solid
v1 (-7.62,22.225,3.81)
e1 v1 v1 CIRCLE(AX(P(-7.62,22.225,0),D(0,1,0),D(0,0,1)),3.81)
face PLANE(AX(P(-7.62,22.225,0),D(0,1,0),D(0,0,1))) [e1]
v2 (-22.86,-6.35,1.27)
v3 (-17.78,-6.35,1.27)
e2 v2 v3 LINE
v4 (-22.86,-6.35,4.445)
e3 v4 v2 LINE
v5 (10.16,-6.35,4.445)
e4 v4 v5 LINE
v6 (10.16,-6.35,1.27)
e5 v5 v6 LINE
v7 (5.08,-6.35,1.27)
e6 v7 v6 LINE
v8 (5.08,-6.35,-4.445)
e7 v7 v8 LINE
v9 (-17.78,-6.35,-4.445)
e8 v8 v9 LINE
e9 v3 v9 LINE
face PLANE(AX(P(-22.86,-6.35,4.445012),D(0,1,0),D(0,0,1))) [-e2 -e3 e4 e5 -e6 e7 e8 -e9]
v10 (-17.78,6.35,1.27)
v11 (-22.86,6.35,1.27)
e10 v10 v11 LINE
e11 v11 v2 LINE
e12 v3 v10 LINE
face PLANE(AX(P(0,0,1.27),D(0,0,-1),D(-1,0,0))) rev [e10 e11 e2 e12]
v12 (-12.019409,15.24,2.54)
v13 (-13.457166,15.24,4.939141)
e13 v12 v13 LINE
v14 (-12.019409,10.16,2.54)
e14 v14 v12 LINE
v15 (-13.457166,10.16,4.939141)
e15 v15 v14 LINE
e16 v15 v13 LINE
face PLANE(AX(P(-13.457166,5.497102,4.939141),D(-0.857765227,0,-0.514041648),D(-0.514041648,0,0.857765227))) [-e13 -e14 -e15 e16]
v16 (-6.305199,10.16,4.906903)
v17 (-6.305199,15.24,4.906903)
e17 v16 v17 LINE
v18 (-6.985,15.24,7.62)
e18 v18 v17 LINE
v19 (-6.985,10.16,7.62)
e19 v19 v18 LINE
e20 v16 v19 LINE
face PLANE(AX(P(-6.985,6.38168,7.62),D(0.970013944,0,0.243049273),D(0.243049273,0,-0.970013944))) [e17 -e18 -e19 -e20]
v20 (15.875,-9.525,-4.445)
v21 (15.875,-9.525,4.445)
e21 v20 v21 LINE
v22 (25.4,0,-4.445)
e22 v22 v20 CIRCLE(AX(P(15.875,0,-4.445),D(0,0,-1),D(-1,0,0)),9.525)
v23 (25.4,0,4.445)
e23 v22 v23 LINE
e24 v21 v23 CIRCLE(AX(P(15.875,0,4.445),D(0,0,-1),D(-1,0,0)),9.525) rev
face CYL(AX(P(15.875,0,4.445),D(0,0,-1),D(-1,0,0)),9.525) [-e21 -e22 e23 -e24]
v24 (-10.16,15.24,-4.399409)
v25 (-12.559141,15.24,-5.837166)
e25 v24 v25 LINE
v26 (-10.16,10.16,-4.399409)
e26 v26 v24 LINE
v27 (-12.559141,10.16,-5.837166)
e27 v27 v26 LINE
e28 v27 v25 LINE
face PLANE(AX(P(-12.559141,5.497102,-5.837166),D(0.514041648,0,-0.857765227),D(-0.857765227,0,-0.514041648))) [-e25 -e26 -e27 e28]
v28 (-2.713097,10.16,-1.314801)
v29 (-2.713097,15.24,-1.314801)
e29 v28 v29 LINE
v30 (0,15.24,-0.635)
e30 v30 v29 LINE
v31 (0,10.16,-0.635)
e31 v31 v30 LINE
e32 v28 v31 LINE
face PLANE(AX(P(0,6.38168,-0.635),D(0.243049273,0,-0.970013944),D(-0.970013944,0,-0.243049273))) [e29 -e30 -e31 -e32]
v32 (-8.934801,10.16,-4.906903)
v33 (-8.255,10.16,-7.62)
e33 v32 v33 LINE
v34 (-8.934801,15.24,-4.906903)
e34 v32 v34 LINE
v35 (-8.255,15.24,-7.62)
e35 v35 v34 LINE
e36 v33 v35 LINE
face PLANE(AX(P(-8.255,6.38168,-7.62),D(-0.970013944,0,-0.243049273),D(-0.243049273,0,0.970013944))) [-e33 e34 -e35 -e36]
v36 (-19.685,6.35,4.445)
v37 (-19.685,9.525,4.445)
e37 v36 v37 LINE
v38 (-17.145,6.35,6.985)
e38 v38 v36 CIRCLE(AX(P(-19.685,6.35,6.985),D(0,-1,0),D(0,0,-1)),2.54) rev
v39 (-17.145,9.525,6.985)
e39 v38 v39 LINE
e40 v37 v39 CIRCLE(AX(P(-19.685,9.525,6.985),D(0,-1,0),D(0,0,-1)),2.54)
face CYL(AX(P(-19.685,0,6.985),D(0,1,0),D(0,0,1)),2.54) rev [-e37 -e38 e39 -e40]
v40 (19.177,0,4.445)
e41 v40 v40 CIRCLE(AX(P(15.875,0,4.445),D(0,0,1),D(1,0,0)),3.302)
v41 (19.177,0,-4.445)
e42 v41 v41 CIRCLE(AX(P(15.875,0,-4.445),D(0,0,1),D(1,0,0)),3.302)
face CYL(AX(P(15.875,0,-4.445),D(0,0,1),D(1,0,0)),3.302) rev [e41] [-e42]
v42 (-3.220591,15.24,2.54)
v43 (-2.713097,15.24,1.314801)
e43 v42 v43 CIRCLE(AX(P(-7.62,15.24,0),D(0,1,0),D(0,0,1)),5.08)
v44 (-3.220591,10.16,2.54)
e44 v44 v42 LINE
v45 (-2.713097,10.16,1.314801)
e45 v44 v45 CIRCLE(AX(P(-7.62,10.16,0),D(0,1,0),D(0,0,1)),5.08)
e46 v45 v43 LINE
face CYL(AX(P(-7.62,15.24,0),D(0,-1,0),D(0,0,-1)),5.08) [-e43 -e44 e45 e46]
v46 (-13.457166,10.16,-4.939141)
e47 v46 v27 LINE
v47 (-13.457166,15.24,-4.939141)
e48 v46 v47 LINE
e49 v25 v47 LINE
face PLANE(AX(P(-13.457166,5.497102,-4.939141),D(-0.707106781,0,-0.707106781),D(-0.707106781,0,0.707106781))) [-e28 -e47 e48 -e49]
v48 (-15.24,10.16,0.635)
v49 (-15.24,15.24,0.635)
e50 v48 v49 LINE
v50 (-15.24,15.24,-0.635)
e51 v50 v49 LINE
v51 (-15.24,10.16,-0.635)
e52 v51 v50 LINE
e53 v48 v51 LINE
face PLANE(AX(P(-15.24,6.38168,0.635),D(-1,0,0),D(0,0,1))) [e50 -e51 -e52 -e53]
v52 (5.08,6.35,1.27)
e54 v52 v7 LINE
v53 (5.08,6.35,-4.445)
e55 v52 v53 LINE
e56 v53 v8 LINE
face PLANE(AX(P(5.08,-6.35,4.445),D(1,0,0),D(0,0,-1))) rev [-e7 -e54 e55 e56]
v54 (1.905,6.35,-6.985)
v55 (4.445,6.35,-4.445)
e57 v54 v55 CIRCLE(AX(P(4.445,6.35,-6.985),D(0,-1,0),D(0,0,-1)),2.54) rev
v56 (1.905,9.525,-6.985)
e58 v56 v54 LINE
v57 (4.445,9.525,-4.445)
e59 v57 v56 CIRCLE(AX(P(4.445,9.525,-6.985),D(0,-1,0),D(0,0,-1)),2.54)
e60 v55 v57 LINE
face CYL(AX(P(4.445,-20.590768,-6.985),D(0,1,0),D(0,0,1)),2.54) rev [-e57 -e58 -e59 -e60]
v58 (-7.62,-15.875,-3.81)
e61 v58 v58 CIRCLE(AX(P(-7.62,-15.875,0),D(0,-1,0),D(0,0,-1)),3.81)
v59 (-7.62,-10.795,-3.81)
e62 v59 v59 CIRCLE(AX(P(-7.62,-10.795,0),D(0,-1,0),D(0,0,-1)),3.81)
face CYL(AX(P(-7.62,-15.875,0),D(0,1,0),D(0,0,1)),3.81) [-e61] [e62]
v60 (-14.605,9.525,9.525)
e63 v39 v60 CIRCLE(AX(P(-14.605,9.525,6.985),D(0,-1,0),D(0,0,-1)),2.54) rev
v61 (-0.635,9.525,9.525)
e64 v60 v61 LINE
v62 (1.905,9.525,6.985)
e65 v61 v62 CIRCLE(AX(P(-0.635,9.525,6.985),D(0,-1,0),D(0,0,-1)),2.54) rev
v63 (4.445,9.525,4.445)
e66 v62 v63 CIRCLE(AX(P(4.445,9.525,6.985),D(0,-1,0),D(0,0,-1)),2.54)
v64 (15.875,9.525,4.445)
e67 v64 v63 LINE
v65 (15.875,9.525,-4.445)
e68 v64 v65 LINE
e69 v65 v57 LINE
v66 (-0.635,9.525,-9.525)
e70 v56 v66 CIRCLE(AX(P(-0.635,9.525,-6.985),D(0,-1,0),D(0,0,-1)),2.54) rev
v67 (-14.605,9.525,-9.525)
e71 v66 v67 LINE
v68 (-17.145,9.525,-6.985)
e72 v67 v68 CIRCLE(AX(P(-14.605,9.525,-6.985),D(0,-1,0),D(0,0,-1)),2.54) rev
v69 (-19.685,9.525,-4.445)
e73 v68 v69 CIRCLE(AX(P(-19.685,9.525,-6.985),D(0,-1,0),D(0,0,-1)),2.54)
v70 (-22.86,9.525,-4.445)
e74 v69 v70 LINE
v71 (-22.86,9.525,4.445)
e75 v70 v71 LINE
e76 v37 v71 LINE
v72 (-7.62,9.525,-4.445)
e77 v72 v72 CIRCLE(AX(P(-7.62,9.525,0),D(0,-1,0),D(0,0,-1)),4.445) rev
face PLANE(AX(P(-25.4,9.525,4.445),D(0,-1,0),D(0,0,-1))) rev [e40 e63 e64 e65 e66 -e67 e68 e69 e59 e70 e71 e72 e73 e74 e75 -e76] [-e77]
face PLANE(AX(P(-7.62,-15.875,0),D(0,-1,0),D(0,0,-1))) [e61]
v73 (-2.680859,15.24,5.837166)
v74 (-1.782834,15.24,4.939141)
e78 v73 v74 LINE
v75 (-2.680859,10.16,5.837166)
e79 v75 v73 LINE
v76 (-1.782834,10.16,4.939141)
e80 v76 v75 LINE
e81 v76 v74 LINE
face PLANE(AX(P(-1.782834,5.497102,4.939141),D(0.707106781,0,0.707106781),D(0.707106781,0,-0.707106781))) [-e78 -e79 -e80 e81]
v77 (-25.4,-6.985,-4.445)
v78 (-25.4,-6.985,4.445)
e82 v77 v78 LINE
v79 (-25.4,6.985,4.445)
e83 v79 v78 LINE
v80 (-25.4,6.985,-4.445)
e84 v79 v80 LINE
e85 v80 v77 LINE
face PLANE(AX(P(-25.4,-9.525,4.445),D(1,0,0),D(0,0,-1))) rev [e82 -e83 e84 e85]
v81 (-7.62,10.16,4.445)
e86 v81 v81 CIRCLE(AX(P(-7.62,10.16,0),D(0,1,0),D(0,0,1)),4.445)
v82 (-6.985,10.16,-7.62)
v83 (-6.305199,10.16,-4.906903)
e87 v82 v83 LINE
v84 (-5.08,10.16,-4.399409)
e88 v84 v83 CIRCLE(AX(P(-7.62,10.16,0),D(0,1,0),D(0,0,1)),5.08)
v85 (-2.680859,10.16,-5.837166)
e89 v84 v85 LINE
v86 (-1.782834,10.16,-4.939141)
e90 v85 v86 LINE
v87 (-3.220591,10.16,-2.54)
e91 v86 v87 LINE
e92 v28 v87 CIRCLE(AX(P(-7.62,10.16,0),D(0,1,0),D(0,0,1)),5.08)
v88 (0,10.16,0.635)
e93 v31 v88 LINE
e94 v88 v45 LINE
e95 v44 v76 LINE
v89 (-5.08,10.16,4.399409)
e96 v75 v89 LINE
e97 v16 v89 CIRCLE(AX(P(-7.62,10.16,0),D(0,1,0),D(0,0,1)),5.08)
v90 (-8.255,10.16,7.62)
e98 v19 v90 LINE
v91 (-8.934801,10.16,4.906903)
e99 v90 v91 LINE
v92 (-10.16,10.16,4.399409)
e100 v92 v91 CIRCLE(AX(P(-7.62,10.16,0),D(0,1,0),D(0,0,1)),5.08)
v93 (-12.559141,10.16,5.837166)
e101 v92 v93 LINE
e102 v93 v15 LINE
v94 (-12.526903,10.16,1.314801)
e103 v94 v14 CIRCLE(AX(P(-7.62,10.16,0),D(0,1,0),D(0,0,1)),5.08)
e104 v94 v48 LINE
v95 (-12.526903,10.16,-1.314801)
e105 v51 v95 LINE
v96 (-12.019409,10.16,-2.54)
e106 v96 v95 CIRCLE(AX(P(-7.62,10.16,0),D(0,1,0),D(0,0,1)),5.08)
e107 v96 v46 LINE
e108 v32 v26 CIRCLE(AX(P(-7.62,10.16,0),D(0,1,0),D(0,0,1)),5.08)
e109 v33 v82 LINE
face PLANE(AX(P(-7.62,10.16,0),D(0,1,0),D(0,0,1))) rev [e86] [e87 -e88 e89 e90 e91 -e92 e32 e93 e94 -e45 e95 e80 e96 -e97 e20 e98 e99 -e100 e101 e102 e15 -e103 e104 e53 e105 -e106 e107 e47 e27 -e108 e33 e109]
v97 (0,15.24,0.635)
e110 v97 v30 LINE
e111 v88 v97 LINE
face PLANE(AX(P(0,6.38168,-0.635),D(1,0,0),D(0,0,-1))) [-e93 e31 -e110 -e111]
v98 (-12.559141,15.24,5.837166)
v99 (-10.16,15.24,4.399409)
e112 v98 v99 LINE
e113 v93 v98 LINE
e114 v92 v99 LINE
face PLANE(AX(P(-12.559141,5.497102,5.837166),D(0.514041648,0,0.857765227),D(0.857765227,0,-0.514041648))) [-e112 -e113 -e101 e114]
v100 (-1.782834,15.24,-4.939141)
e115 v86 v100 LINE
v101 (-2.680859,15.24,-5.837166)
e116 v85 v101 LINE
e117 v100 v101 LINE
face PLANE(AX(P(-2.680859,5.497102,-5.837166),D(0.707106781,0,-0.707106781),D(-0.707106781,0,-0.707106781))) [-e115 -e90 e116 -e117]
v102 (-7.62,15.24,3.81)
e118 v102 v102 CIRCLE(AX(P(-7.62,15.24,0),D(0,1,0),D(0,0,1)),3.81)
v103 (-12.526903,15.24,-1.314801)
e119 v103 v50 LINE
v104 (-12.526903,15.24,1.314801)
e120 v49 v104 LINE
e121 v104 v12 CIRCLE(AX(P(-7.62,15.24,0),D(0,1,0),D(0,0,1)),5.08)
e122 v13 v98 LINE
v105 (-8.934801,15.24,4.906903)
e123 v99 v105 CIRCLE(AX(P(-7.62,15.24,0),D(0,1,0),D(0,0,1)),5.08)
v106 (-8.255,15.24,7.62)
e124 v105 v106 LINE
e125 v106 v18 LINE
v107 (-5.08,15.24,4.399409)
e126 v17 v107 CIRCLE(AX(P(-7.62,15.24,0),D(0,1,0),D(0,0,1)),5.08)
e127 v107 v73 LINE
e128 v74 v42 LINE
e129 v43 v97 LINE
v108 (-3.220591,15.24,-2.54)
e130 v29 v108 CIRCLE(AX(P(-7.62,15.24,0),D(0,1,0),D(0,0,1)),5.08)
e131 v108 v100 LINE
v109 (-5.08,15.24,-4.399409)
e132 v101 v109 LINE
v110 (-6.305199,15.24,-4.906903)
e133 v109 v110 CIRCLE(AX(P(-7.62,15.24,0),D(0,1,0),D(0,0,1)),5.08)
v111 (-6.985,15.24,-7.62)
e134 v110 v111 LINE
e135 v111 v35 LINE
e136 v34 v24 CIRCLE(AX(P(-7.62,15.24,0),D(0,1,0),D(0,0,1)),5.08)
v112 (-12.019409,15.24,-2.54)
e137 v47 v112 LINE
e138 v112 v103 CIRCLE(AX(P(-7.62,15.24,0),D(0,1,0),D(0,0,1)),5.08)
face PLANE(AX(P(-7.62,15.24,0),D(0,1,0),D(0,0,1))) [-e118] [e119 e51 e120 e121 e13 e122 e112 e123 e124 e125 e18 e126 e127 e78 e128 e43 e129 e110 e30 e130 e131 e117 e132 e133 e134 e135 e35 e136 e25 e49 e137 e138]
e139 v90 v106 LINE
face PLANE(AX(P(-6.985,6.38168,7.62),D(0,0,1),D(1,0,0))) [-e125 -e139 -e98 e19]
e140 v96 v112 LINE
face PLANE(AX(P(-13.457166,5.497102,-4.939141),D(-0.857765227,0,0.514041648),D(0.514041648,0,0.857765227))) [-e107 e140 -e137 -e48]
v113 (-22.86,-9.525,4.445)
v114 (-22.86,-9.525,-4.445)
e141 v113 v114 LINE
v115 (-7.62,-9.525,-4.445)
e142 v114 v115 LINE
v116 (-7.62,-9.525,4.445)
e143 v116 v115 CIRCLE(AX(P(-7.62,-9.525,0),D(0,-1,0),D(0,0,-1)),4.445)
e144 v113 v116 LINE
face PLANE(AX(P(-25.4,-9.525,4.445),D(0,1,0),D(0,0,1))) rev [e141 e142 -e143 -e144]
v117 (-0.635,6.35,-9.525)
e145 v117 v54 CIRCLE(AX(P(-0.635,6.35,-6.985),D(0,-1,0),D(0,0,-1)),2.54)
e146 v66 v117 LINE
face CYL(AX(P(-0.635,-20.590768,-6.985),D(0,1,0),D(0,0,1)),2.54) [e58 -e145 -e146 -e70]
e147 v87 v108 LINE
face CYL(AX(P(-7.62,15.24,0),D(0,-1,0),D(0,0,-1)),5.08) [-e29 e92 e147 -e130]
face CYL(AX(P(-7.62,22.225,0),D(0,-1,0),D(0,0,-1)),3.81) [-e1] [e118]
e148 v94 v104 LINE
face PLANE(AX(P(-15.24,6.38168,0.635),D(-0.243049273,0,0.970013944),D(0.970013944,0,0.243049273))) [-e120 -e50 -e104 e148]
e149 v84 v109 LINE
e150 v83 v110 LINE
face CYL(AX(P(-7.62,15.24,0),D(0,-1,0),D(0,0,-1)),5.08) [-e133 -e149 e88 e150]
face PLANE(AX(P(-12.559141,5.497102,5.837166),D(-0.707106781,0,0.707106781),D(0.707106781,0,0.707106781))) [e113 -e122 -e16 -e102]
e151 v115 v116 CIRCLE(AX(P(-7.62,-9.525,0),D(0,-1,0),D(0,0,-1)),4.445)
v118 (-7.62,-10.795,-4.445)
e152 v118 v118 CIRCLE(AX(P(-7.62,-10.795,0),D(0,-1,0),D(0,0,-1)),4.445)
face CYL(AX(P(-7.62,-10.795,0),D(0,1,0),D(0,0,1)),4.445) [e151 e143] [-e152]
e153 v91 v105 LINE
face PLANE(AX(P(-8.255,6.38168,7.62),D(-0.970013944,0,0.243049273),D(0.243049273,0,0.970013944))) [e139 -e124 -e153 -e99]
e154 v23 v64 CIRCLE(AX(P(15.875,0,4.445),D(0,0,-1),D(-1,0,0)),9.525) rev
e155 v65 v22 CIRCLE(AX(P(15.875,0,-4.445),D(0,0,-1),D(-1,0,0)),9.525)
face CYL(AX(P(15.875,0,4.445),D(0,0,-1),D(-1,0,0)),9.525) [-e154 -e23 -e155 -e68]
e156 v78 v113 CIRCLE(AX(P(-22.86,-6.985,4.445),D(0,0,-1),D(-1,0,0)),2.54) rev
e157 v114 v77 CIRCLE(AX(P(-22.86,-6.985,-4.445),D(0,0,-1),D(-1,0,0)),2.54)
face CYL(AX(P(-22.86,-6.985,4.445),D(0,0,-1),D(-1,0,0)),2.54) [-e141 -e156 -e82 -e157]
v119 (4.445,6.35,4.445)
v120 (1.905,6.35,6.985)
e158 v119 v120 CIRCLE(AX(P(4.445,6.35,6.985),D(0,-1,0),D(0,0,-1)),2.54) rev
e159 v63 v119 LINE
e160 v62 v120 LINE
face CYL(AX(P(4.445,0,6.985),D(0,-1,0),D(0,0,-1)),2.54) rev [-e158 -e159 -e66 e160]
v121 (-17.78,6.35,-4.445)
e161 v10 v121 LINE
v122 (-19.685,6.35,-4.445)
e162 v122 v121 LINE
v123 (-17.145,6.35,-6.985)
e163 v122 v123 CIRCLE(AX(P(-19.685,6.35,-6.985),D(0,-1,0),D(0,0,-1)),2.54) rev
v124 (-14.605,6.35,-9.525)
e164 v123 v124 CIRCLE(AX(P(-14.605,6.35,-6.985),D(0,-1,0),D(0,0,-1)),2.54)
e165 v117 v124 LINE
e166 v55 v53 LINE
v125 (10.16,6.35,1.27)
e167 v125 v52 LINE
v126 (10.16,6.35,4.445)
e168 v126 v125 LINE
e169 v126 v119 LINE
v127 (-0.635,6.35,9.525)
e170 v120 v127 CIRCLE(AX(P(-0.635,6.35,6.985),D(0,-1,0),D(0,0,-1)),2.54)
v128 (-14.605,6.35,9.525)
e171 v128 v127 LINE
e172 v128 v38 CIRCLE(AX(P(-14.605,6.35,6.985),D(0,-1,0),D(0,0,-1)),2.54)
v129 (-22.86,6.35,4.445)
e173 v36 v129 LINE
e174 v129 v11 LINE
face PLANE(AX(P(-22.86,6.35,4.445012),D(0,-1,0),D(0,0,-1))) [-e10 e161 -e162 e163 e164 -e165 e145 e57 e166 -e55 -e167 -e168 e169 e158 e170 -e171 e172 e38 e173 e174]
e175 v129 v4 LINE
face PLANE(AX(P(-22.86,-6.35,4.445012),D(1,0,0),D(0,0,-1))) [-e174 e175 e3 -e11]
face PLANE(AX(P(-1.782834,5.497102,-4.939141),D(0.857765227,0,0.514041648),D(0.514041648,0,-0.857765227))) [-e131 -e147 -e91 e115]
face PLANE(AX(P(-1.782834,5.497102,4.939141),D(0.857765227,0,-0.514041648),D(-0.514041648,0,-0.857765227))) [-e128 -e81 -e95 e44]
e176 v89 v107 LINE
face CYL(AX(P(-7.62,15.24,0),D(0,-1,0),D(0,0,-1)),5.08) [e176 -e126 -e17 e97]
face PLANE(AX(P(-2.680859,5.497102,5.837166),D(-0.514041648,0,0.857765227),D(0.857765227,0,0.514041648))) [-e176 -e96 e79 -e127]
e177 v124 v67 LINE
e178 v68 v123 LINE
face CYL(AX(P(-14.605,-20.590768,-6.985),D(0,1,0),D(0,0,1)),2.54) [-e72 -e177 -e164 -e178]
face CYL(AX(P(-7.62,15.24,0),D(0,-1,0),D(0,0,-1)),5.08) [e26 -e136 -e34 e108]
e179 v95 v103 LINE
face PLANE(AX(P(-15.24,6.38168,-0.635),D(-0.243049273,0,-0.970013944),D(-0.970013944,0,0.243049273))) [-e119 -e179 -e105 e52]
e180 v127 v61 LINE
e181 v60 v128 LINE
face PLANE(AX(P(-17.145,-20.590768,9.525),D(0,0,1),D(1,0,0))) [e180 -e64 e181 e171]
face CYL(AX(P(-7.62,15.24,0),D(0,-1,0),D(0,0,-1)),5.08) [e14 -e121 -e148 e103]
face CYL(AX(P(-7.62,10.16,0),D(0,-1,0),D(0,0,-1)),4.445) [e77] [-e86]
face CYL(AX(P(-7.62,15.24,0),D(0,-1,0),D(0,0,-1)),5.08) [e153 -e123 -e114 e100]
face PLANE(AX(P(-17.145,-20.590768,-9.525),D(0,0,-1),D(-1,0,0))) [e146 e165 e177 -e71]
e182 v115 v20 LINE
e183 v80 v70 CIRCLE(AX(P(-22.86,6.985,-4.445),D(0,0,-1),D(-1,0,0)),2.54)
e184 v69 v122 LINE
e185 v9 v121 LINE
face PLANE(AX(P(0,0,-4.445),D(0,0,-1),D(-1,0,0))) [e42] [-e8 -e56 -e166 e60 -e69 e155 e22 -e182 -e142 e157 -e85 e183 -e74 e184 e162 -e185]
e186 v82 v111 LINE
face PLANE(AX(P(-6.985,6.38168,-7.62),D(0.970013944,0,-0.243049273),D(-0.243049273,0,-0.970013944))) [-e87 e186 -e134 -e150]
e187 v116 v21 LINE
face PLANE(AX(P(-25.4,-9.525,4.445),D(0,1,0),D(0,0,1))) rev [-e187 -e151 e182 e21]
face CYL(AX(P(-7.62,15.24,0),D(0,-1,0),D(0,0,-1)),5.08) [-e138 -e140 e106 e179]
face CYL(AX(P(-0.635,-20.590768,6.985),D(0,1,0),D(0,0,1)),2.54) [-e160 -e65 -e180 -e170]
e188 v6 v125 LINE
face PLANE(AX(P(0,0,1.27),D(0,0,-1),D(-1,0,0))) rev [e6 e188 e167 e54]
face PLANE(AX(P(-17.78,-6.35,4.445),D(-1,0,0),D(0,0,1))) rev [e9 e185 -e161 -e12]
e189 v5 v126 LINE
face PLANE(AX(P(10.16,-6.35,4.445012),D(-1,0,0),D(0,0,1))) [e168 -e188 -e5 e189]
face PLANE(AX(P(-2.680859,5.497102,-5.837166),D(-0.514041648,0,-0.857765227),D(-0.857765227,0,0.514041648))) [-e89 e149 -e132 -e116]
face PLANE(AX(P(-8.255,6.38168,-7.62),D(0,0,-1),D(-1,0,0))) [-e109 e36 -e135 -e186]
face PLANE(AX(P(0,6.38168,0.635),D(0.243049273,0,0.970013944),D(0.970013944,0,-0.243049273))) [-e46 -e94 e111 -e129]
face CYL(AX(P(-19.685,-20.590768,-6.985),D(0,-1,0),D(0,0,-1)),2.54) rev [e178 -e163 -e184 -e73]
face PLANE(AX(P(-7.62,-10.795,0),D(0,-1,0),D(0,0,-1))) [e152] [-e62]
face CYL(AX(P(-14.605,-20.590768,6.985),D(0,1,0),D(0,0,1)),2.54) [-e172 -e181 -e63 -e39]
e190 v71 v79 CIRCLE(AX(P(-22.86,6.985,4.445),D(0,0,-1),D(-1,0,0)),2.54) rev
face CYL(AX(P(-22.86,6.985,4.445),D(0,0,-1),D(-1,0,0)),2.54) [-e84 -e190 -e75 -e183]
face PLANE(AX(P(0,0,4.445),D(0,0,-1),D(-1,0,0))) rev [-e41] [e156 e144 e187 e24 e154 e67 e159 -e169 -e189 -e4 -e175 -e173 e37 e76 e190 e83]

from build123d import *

# Parameters (mm, degrees)
SKETCH2_W               = 50.8
SKETCH2_H               = 19.05
BOSS_EXTRUDE1_DEPTH     = 4.445
CUT_EXTRUDE1_DEPTH      = 33.29387358
CUT_EXTRUDE1_DEPTH_BACK = 3.175
SKETCH4_W               = 33.02
SKETCH4_H               = 12.7
SKETCH6_W               = 22.86
SKETCH6_H               = 12.7
CUT_EXTRUDE2_DEPTH      = 29.546763827
FILLET2_R               = 9.525
SKETCH9_R               = 3.302
CUT_EXTRUDE4_DEPTH      = 29.546763827
SKETCH10_W              = 19.05
SKETCH10_H              = 19.05
BOSS_EXTRUDE2_DEPTH     = 3.175
FILLET1_R               = 2.54
SKETCH11_R              = 3.81
BOSS_EXTRUDE3_DEPTH     = 12.7
BOSS_EXTRUDE4_START     = 6.35
SKETCH12_R              = 3.81
BOSS_EXTRUDE4_DEPTH     = 6.35
SKETCH13_R              = 4.445
BOSS_EXTRUDE5_DEPTH     = 0.635
SKETCH14_R              = 5.08
BOSS_EXTRUDE6_DEPTH     = 5.08
BOSS_EXTRUDE7_DEPTH     = 5.08
CIRPATTERN1_COUNT       = 8
BOSS_EXTRUDE8_START     = 1.27
SKETCH16_R              = 4.445
BOSS_EXTRUDE8_DEPTH     = 1.27


# Some blends are built 0.0001 mm under size
with BuildPart() as part:
    # Sketch2 → Boss-Extrude1 (new, symmetric)
    with BuildSketch(Plane.XY):
        Rectangle(SKETCH2_W, SKETCH2_H)
    extrude(amount=BOSS_EXTRUDE1_DEPTH, both=True)

    # Sketch4 → Cut-Extrude1 (cut, two sides: drawn at the far end of the back side and taken through both)
    with BuildSketch(Plane(origin=(2.106978659, 4.870426214, 4.445), x_dir=(1, 0, 0), z_dir=(0, 0, 1)).offset(-CUT_EXTRUDE1_DEPTH_BACK)):
        with Locations((-8.456978659, -4.870426214)):
            Rectangle(SKETCH4_W, SKETCH4_H)
    extrude(amount=CUT_EXTRUDE1_DEPTH + CUT_EXTRUDE1_DEPTH_BACK, mode=Mode.SUBTRACT)

    # Sketch6 → Cut-Extrude2 (cut, through all)
    with BuildSketch(Plane(origin=(0, 0, -4.445), x_dir=(-1, 0, 0), z_dir=(0, 0, -1))):
        with Locations((6.35, 0)):
            Rectangle(SKETCH6_W, SKETCH6_H)
    extrude(amount=-CUT_EXTRUDE2_DEPTH, mode=Mode.SUBTRACT)

    # Fillet2
    fillet2_edges = [part.edges().sort_by_distance(p)[0] for p in [
        (25.4, -9.525, 0),
        (25.4, 9.525, 0),
    ]]
    fillet(fillet2_edges, radius=FILLET2_R - 0.0001)  # a hair under: the kernel refuses the full size

    # Sketch9 → Cut-Extrude4 (cut, through all)
    with BuildSketch(Plane.XY.offset(4.445)):
        with Locations((15.875, 0)):
            Circle(SKETCH9_R)
    extrude(amount=-CUT_EXTRUDE4_DEPTH, mode=Mode.SUBTRACT)

    # Sketch10 → Boss-Extrude2 (add)
    with BuildSketch(Plane(origin=(0, 9.525, 0), x_dir=(1, 0, 0), z_dir=(0, 1, 0))):
        with Locations((-7.62, 0)):
            Rectangle(SKETCH10_W, SKETCH10_H)
    extrude(amount=-BOSS_EXTRUDE2_DEPTH)

    # Fillet1
    # the kernel refuses this fillet: 2.54 mm, written as the material it adds along each edge
    with BuildSketch(Plane(origin=(-17.145, 9.525, -4.445), x_dir=(-1, 0, 0), z_dir=(0, -1, 0)), Plane(origin=(1.905, 6.35, -4.445), x_dir=(1, 0, 0), z_dir=(0, 1, 0))) as fillet1_piece_1:
        with BuildLine():
            CenterArc((FILLET1_R, FILLET1_R), FILLET1_R, 180, 90)
            Line((0, FILLET1_R), (0, 0))
            Line((0, 0), (FILLET1_R, 0))
        make_face()
    extrude(amount=3.175)
    with BuildSketch(Plane(origin=(1.905, 6.35, 4.445), x_dir=(1, 0, 0), z_dir=(0, 1, 0)), Plane(origin=(-17.145, 9.525, 4.445), x_dir=(-1, 0, 0), z_dir=(0, -1, 0))) as fillet1_piece_2:
        with BuildLine():
            CenterArc((FILLET1_R, -FILLET1_R), FILLET1_R, 90, 90)
            Line((0, -FILLET1_R), (0, 0))
            Line((0, 0), (FILLET1_R, 0))
        make_face()
    extrude(amount=3.175)
    # the kernel refuses this fillet: 2.54 mm, written as the material it takes off along each edge
    with BuildSketch(Plane(origin=(-25.4, -9.525, 10.795), x_dir=(1, 0, 0), z_dir=(0, 0, -1)), Plane(origin=(-25.4, 9.525, 10.795), x_dir=(0, -1, 0), z_dir=(0, 0, -1))) as fillet1_2_piece_1:
        with BuildLine():
            CenterArc((FILLET1_R, -FILLET1_R), FILLET1_R, 90, 90)
            Line((0, -FILLET1_R), (0, 0))
            Line((0, 0), (FILLET1_R, 0))
        make_face()
    extrude(amount=21.59, mode=Mode.SUBTRACT)
    with BuildSketch(Plane(origin=(-17.145, 15.875, -9.525), x_dir=(1, 0, 0), z_dir=(0, -1, 0)), Plane(origin=(1.905, 15.875, -9.525), x_dir=(0, 0, 1), z_dir=(0, -1, 0)), Plane(origin=(-17.145, 15.875, 9.525), x_dir=(0, 0, -1), z_dir=(0, -1, 0)), Plane(origin=(1.905, 15.875, 9.525), x_dir=(-1, 0, 0), z_dir=(0, -1, 0))) as fillet1_2_piece_2:
        with BuildLine():
            CenterArc((FILLET1_R, FILLET1_R), FILLET1_R, 180, 90)
            Line((0, FILLET1_R), (0, 0))
            Line((0, 0), (FILLET1_R, 0))
        make_face()
    extrude(amount=15.875, mode=Mode.SUBTRACT)

    # Sketch11 → Boss-Extrude3 (add)
    with BuildSketch(Plane(origin=(0, 9.525, 0), x_dir=(1, 0, 0), z_dir=(0, 1, 0))):
        with Locations(Location((-7.62, 0, 0), (0, 0, 90))):
            Circle(SKETCH11_R)
    extrude(amount=BOSS_EXTRUDE3_DEPTH)

    # Sketch12 → Boss-Extrude4 (add)
    with BuildSketch(Plane.XZ.offset(9.525).offset(BOSS_EXTRUDE4_START)):
        with Locations(Location((-7.62, 0, 0), (0, 0, 270))):
            Circle(SKETCH12_R)
    extrude(amount=-BOSS_EXTRUDE4_DEPTH)

    # Sketch13 → Boss-Extrude5 (add)
    with BuildSketch(Plane(origin=(0, 9.525, 0), x_dir=(1, 0, 0), z_dir=(0, 1, 0))):
        with Locations(Location((-7.62, 0, 0), (0, 0, 90))):
            Circle(SKETCH13_R)
    extrude(amount=BOSS_EXTRUDE5_DEPTH)

    # Sketch14 → Boss-Extrude6 (add)
    with BuildSketch(Plane(origin=(0, 10.16, 0), x_dir=(1, 0, 0), z_dir=(0, 1, 0))):
        with Locations(Location((-7.62, 0, 0), (0, 0, 270))):
            Circle(SKETCH14_R)
    extrude(amount=BOSS_EXTRUDE6_DEPTH)

    # Sketch15 → Boss-Extrude7 (add)
    with BuildSketch(Plane(origin=(0, 15.24, 0), x_dir=(1, 0, 0), z_dir=(0, 1, 0))):
        Polygon((-8.255, 7.62), (-6.985, 7.62), (-6.305199251, 4.906903198), (-8.934800749, 4.906903198), align=None)
    boss_extrude7 = extrude(amount=-BOSS_EXTRUDE7_DEPTH)

    # CirPattern1: Boss-Extrude7 ×8 about axis
    cirpattern1_axis = Axis((-7.62, 0, 0), (0, 1, 0))
    for i in range(1, CIRPATTERN1_COUNT):
        add(boss_extrude7.rotate(cirpattern1_axis, i * 360 / CIRPATTERN1_COUNT))

    # Sketch16 → Boss-Extrude8 (add)
    with BuildSketch(Plane.XZ.offset(9.525).offset(BOSS_EXTRUDE8_START)):
        with Locations(Location((-7.62, 0, 0), (0, 0, 270))):
            Circle(SKETCH16_R)
    extrude(amount=-BOSS_EXTRUDE8_DEPTH)


solid = part.part
